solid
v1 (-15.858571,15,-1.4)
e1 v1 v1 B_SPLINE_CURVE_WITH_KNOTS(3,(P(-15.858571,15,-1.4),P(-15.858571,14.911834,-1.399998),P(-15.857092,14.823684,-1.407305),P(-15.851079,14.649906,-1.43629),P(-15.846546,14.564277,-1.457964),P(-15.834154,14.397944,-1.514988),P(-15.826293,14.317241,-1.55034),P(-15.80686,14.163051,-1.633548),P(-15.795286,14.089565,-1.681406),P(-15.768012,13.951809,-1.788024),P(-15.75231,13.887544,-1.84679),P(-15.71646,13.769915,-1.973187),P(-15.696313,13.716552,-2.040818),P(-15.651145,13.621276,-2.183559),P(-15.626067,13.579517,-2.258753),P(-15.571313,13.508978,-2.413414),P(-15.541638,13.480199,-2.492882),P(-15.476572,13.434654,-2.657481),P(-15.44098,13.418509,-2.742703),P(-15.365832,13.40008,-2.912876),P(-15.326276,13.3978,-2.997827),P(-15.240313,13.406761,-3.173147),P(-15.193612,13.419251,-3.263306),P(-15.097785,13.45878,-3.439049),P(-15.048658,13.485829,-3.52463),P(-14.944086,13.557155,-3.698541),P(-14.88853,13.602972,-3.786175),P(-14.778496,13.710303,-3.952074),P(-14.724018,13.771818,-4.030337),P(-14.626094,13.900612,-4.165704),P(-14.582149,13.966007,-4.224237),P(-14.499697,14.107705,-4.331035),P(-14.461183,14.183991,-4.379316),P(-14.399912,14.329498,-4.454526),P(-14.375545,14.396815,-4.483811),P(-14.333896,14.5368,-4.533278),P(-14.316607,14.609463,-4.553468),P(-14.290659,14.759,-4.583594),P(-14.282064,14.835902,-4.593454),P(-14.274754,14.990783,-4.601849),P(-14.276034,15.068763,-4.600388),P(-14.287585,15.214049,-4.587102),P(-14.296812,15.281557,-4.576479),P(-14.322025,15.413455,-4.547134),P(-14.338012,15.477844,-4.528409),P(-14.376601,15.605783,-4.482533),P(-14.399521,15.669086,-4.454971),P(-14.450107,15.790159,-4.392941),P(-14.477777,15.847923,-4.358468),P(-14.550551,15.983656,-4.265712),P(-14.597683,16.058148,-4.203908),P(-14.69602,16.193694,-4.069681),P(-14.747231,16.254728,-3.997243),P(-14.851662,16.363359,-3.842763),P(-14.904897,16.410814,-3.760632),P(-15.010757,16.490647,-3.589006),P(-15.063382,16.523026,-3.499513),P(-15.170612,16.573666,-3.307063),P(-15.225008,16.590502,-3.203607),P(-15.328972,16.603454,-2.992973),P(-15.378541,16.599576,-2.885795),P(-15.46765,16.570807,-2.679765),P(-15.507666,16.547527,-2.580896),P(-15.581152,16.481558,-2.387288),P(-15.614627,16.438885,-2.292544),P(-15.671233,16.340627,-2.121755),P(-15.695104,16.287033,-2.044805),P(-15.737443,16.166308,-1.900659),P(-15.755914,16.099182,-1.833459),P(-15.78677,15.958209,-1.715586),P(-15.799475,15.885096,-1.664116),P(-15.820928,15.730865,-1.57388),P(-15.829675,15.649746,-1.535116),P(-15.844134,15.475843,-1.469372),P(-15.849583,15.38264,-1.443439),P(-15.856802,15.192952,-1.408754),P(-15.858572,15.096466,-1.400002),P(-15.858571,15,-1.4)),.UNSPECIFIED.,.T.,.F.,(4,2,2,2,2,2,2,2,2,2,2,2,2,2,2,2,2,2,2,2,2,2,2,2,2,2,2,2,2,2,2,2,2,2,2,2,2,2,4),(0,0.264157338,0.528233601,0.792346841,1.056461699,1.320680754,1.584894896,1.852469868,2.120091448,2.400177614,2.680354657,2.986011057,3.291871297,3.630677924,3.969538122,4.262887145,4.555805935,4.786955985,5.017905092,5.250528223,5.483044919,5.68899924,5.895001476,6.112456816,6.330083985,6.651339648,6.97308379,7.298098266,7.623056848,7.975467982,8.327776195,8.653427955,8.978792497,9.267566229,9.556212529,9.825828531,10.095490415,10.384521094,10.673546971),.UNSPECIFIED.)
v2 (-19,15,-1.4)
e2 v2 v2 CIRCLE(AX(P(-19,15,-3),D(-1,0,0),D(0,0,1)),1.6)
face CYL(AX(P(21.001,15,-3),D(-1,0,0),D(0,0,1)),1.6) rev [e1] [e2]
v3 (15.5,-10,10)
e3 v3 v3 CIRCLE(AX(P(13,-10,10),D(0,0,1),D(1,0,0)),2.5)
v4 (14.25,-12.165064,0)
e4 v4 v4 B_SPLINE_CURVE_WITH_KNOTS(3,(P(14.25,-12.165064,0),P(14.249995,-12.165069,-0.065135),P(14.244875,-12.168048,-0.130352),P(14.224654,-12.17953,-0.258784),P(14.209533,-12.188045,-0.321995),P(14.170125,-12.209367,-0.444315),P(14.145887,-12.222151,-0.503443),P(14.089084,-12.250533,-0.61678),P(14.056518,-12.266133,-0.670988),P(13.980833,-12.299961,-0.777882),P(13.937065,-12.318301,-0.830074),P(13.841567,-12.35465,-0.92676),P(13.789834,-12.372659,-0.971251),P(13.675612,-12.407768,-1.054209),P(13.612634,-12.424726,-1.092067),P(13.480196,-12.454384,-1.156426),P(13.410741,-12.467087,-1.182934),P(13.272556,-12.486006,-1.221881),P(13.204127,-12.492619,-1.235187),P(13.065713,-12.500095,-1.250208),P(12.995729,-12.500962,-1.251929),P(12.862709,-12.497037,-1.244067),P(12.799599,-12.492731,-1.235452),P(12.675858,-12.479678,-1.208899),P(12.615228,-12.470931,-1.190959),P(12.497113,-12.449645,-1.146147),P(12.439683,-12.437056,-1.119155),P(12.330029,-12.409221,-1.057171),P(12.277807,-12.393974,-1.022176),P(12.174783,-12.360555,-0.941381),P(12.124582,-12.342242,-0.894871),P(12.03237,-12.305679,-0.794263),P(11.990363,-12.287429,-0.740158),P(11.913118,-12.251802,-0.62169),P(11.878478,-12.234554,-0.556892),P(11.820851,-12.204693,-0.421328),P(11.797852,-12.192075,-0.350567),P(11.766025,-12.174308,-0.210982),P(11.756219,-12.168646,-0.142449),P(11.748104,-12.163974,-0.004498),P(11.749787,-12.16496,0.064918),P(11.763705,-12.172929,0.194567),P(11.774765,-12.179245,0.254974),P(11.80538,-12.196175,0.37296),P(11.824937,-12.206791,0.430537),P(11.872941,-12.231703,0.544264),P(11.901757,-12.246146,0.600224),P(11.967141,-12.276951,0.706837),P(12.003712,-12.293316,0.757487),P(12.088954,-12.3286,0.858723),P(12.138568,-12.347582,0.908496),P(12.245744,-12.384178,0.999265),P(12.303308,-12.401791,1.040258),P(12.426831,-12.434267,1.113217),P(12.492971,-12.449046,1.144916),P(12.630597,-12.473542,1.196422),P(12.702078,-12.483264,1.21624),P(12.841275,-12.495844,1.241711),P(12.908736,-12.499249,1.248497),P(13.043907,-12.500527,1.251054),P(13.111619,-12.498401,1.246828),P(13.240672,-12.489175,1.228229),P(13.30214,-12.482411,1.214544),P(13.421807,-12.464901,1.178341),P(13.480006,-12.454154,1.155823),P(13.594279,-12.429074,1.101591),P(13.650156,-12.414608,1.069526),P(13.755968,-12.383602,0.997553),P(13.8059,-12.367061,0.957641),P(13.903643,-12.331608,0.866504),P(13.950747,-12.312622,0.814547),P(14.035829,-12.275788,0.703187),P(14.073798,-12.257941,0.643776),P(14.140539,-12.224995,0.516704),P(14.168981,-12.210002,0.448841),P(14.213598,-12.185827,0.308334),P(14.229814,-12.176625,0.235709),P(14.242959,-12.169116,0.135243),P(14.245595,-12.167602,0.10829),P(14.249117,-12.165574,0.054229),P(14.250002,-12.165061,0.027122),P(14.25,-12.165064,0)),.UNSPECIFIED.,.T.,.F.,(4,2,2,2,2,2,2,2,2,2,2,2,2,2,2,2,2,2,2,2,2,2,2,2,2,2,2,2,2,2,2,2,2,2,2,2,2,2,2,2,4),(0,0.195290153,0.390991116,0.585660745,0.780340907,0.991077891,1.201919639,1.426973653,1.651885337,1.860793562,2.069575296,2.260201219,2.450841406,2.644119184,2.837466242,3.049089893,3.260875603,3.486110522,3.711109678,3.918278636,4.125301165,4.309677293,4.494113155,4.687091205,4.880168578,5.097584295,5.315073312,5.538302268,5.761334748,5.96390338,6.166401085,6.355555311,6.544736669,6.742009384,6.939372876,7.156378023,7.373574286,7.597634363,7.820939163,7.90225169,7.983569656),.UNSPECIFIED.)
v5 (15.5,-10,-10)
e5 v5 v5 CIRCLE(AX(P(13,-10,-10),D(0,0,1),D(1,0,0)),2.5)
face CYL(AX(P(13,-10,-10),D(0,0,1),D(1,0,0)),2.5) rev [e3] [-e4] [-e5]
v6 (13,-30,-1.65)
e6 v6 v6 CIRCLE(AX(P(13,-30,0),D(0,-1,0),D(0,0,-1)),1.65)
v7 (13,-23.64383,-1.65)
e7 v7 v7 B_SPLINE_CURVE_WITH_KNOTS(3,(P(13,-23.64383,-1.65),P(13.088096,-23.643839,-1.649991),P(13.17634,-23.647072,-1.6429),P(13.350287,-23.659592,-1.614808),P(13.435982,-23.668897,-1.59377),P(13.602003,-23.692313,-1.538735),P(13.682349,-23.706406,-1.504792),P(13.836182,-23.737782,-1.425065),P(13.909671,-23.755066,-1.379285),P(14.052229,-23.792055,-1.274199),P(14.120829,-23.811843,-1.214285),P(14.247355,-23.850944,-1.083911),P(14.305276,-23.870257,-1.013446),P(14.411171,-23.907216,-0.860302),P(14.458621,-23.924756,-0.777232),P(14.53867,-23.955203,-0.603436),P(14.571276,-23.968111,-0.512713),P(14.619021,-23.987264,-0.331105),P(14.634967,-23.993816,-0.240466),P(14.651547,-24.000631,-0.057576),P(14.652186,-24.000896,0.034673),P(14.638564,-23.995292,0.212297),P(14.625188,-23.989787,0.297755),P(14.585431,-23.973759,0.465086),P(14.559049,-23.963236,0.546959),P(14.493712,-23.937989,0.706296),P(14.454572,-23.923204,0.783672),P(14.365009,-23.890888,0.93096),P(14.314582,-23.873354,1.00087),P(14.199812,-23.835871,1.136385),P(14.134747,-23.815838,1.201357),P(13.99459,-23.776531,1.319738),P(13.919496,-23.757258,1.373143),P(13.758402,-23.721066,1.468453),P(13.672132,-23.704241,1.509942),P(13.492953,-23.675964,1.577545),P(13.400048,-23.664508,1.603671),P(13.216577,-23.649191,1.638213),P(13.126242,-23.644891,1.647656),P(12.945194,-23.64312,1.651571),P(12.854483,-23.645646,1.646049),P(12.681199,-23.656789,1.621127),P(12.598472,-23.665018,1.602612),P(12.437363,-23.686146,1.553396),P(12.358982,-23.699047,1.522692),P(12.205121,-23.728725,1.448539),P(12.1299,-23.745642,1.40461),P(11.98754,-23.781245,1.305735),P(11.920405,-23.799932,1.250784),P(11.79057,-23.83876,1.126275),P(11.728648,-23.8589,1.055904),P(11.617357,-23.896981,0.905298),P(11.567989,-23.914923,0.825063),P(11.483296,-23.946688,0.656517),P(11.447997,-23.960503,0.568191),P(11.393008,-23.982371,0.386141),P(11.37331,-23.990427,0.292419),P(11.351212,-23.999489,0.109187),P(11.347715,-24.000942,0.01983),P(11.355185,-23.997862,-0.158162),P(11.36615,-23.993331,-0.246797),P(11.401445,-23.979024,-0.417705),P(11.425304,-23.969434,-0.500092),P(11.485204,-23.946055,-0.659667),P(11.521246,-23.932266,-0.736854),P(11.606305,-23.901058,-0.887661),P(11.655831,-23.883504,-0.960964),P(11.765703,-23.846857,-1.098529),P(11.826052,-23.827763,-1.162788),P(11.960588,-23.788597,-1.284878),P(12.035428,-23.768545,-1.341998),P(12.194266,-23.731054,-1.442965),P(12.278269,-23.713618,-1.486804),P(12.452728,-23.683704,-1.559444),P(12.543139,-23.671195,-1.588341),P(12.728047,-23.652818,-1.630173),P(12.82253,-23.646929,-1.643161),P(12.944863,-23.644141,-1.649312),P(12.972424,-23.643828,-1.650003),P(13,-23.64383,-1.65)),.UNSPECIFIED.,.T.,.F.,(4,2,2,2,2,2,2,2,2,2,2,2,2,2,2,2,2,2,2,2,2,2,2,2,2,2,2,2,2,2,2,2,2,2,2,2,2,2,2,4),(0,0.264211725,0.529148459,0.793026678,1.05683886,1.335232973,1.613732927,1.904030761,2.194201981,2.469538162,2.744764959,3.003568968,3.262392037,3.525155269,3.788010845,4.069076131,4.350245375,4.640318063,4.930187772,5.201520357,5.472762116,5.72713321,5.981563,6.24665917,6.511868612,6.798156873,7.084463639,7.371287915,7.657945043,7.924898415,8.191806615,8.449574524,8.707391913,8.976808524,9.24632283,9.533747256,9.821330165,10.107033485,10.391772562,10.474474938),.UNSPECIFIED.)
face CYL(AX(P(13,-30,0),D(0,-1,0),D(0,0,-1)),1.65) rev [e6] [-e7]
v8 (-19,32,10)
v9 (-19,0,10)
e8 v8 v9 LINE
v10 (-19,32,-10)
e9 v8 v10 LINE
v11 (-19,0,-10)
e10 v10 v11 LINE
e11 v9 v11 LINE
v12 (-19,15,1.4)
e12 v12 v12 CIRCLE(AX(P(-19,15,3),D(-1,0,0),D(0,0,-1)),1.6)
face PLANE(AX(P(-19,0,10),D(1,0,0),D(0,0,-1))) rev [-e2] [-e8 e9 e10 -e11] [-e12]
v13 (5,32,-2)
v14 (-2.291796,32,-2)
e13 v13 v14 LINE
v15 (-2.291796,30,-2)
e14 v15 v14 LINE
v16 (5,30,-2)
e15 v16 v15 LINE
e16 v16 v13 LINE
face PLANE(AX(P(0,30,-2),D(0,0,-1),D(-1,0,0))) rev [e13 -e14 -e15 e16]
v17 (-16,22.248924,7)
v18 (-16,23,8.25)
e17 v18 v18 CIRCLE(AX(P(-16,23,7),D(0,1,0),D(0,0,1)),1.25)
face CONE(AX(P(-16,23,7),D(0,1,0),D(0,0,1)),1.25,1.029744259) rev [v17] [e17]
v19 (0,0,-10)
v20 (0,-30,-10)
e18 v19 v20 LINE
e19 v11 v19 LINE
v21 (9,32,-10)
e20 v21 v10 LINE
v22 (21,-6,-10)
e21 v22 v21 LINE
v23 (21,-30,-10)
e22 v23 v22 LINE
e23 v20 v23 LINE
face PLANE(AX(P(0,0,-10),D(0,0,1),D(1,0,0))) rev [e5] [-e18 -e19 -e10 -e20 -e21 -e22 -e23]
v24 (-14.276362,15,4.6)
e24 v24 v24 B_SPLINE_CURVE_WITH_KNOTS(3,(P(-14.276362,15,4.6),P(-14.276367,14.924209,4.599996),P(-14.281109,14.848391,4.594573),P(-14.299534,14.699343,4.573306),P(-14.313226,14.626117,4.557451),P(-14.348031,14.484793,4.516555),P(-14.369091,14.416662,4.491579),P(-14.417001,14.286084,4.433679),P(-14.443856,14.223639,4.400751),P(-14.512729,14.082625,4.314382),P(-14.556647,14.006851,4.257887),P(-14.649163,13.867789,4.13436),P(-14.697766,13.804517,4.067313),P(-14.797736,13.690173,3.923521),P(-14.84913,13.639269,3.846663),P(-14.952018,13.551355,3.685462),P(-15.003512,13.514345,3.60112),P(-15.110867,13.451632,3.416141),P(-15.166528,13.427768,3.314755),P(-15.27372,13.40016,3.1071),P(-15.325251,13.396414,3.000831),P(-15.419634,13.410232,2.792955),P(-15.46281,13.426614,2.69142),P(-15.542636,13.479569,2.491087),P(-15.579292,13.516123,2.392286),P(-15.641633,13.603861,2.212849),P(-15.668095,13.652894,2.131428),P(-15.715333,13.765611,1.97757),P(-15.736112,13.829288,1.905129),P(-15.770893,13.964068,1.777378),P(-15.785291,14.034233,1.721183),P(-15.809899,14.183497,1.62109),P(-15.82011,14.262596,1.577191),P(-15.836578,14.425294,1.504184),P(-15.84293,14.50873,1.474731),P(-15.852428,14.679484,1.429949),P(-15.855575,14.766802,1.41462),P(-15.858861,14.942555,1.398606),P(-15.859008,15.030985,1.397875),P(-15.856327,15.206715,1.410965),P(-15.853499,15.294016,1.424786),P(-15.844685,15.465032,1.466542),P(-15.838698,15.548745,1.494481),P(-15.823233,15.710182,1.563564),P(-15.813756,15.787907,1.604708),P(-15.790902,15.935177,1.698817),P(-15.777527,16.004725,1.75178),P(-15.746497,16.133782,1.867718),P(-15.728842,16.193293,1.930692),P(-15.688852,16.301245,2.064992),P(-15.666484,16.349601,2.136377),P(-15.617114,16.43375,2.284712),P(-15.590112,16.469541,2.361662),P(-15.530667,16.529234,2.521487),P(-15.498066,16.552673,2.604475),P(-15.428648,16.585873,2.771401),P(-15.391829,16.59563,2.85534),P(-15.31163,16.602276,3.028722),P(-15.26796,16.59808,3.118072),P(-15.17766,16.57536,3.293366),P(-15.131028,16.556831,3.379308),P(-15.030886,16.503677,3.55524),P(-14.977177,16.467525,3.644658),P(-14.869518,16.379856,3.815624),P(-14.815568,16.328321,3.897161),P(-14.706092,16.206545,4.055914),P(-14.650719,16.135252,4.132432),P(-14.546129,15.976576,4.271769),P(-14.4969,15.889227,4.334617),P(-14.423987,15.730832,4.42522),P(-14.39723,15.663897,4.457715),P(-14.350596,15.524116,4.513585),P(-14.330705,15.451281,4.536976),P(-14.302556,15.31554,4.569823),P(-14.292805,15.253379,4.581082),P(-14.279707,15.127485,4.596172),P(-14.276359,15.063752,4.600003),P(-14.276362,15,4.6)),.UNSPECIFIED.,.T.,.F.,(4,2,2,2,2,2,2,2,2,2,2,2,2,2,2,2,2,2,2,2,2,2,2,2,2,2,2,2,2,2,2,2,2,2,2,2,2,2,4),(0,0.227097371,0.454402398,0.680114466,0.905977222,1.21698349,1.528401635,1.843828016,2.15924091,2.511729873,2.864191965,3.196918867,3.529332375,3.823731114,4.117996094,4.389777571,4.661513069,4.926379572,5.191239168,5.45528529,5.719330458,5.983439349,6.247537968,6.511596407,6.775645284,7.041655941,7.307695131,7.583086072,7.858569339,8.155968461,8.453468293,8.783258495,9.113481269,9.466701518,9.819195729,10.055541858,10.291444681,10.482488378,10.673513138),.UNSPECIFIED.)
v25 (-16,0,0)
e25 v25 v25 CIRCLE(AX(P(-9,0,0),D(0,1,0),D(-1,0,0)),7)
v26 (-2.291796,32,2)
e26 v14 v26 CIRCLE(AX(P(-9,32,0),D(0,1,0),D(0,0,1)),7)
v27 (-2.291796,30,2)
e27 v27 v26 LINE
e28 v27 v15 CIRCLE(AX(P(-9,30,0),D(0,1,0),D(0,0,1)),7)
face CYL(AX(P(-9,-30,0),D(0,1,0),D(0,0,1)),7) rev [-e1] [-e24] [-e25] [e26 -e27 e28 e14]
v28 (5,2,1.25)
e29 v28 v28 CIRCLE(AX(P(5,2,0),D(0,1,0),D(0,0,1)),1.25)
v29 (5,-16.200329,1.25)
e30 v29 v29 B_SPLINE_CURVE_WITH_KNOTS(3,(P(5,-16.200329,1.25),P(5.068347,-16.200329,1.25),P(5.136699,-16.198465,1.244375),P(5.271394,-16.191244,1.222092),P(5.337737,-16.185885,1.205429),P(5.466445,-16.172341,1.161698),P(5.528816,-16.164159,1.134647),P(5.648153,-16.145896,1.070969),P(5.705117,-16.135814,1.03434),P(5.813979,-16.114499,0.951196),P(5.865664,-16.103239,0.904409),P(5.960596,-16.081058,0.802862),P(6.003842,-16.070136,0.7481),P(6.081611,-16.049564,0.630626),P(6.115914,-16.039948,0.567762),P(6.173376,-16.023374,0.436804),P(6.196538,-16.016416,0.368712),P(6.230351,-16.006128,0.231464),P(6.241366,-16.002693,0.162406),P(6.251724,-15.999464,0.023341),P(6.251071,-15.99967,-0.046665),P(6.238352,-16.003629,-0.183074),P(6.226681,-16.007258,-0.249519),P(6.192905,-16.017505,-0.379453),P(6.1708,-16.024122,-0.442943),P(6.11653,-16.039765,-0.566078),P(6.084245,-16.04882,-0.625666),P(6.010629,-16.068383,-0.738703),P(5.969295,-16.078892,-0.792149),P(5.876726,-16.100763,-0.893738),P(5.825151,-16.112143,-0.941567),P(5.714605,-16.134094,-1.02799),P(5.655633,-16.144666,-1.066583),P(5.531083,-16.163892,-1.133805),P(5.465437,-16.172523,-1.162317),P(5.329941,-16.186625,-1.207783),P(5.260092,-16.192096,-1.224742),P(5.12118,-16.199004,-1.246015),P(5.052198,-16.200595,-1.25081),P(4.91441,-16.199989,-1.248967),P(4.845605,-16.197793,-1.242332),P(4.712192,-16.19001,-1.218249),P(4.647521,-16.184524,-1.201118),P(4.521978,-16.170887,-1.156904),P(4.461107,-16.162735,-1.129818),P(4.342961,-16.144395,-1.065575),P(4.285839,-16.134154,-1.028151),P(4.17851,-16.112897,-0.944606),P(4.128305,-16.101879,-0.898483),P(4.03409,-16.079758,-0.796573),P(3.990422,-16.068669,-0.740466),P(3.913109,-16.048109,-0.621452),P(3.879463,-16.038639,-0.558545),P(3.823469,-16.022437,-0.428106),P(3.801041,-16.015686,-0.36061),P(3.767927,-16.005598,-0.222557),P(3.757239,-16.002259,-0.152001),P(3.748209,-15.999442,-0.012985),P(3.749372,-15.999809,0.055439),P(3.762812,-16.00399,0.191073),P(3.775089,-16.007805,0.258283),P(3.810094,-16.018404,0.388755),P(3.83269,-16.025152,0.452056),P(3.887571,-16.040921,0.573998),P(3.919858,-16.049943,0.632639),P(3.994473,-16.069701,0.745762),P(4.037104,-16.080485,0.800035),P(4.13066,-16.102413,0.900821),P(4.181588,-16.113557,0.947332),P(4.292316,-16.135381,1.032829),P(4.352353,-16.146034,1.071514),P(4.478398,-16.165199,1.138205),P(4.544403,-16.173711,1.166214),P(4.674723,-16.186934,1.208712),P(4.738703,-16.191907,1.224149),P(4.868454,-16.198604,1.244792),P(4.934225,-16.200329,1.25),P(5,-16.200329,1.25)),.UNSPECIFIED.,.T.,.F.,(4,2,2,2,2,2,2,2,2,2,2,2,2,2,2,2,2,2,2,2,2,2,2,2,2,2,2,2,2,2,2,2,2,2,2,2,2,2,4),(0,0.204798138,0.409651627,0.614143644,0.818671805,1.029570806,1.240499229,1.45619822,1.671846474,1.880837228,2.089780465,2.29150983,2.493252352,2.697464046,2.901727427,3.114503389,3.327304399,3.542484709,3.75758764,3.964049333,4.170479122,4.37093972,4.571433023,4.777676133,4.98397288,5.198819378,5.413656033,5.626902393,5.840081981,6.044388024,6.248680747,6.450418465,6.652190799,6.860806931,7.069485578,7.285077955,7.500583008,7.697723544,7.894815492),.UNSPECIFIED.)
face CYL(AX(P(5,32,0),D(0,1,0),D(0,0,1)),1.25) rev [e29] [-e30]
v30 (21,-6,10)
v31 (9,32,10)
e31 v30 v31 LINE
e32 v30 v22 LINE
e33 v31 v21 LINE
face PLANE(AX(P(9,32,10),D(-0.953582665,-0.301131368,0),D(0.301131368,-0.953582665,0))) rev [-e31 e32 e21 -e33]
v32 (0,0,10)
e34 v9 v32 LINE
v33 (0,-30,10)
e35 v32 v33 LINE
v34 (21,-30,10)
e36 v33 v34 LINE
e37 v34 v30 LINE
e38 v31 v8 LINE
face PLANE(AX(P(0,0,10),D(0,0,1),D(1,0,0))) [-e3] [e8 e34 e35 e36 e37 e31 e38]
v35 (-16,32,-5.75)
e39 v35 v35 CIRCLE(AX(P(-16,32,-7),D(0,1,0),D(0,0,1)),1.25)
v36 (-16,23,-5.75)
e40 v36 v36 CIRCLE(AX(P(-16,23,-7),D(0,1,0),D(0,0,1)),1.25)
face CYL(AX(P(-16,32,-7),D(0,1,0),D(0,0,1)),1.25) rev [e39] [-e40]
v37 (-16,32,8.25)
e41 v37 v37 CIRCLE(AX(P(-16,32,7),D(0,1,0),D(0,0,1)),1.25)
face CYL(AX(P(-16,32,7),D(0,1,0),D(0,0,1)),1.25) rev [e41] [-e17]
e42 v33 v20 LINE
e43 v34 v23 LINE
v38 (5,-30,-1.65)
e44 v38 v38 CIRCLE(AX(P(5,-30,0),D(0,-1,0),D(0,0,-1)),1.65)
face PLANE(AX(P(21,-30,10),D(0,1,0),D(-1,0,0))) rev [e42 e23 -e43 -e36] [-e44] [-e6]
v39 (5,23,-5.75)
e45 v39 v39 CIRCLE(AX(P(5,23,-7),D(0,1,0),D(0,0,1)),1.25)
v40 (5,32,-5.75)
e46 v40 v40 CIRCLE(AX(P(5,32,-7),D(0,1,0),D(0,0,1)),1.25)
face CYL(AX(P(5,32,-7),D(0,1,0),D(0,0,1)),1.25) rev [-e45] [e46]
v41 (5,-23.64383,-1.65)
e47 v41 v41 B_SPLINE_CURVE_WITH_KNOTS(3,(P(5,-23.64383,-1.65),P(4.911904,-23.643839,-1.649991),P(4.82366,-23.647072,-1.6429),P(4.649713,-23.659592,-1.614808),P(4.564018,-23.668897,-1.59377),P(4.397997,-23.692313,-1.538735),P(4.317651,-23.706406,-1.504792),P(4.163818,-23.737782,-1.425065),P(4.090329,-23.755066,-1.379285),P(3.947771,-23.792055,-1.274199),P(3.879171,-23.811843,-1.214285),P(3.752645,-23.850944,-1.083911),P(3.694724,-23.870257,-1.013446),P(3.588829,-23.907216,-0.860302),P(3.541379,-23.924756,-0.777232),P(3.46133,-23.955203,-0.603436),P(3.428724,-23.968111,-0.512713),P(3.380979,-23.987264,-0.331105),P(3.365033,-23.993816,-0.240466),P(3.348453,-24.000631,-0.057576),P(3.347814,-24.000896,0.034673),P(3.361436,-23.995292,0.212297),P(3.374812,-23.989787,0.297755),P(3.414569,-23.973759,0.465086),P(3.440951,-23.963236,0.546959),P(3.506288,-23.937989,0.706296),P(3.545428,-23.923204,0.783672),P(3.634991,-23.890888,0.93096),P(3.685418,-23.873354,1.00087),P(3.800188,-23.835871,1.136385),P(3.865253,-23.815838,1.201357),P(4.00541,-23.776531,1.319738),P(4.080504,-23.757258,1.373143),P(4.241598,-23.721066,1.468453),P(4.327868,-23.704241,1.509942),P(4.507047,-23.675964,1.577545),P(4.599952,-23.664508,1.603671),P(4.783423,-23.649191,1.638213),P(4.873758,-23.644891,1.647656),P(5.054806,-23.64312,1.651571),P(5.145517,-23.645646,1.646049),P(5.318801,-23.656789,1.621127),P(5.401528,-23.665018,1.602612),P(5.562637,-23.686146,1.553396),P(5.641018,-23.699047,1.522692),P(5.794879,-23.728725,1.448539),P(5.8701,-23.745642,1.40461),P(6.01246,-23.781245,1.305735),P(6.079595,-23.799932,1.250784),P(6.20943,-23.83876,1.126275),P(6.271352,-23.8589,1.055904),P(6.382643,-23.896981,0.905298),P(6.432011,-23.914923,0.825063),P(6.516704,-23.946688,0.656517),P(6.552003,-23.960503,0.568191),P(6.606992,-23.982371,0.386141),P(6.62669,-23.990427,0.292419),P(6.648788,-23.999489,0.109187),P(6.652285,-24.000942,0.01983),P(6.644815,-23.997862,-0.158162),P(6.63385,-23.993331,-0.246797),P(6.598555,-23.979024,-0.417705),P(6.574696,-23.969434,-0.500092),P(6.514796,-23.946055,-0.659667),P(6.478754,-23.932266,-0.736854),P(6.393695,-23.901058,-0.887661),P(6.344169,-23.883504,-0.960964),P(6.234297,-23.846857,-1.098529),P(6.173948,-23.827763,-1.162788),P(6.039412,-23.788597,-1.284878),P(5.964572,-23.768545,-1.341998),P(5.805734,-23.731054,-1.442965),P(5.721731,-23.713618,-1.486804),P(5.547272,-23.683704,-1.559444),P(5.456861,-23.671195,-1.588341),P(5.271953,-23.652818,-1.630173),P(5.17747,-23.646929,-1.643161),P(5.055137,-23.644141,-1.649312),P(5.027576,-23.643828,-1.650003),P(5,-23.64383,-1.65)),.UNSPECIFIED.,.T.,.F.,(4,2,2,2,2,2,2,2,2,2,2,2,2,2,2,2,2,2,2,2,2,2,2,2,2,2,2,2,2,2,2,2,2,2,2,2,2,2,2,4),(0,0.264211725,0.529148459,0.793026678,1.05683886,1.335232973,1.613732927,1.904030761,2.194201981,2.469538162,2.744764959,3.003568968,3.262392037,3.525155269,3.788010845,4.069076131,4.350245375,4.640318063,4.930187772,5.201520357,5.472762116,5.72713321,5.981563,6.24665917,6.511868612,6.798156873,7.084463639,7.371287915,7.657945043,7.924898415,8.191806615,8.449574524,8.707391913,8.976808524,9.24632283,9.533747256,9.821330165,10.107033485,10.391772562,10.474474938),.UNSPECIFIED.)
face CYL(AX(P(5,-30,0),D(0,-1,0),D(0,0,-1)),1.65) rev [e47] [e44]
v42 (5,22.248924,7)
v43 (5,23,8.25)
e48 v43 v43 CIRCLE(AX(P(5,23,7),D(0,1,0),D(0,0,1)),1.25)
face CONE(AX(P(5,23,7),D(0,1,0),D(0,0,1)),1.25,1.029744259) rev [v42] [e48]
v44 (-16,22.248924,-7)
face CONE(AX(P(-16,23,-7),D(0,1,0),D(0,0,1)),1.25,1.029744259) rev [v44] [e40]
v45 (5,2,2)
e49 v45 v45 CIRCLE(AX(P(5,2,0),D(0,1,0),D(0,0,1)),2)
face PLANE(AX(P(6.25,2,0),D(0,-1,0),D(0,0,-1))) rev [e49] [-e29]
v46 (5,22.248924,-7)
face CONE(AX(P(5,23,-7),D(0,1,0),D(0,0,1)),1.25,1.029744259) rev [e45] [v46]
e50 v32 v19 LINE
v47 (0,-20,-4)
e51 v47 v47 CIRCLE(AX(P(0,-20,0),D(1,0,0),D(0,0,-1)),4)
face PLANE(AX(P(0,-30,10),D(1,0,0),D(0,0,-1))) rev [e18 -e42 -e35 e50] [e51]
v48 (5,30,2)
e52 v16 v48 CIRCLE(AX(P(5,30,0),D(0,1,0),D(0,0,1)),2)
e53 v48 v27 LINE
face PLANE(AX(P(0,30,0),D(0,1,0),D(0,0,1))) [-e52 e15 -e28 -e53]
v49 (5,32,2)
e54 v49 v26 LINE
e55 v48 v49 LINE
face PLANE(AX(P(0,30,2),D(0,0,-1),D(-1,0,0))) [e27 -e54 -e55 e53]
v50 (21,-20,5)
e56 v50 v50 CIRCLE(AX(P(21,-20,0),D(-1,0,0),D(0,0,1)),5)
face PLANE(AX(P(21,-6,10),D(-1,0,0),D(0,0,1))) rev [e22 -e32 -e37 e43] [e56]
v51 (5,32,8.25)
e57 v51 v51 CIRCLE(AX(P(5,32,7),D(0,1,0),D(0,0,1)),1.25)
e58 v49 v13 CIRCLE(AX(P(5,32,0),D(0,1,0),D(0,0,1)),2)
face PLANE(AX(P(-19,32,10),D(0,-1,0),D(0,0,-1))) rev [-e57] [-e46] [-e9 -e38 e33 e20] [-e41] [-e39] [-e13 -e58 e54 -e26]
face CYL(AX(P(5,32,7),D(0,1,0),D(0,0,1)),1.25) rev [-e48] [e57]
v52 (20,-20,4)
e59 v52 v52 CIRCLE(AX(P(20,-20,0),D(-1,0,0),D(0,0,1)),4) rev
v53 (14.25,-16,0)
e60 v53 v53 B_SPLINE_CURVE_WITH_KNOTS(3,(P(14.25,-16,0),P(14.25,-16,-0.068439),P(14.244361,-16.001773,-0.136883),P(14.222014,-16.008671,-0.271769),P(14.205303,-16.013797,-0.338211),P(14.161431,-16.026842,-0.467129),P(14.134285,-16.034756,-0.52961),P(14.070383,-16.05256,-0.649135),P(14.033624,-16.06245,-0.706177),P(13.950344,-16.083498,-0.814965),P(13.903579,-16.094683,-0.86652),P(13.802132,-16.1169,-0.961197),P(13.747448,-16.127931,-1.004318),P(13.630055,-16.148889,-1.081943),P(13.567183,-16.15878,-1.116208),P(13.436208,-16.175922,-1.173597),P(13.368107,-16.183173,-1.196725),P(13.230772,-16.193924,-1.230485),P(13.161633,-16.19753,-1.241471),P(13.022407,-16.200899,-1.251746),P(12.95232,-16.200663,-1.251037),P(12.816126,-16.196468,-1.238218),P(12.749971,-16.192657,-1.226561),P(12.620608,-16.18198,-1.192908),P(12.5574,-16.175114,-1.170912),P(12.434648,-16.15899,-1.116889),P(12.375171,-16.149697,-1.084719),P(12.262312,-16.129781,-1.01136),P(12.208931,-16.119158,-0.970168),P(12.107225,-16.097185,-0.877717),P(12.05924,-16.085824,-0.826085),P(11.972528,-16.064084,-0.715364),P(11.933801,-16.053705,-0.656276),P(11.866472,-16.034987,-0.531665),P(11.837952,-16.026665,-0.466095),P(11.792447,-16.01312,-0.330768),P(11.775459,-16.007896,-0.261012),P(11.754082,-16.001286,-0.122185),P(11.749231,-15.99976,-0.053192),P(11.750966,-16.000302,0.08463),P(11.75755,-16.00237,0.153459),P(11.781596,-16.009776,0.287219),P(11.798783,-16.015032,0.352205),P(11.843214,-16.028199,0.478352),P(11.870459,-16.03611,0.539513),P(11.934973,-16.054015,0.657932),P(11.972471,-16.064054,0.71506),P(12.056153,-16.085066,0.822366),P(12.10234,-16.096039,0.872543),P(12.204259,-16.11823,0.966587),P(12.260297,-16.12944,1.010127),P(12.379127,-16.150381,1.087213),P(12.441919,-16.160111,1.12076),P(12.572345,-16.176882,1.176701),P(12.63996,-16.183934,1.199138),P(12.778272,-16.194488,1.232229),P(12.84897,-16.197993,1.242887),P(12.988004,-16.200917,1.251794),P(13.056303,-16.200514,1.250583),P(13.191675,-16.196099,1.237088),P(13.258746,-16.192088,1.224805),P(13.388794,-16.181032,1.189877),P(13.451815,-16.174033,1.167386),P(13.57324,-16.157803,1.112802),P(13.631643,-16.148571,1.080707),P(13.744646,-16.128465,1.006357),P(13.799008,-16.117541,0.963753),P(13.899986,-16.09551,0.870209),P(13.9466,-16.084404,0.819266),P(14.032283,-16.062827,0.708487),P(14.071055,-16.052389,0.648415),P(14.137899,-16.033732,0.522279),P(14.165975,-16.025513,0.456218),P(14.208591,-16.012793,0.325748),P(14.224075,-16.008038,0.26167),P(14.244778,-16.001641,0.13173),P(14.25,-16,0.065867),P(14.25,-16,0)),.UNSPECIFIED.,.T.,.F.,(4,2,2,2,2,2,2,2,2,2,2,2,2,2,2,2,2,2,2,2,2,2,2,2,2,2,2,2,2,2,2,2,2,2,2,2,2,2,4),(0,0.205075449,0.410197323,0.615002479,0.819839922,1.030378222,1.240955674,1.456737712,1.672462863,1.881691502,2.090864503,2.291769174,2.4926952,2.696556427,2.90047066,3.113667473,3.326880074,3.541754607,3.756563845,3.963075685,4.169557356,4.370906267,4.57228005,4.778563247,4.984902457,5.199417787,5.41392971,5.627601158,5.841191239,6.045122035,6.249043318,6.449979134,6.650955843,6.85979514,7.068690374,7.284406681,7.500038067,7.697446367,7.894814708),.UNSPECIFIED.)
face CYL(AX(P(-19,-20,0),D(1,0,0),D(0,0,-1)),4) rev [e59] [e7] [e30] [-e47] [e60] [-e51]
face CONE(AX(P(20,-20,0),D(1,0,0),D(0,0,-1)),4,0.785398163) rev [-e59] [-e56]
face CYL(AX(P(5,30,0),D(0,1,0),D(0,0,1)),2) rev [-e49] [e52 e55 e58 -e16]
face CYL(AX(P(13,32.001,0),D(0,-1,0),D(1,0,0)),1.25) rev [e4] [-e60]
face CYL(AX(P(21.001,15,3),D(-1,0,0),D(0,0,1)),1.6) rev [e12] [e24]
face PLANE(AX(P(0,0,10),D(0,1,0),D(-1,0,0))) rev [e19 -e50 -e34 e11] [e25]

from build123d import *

# Parameters (mm, degrees)
BOSS_EXTRUDE1_DEPTH      = 10
CUT_EXTRUDE1_DEPTH       = 67.219333
CUT_EXTRUDE2_DEPTH       = 2
M3_TAPPED_HOLE1_D        = 2.5
M3_TAPPED_HOLE1_DEPTH    = 9
M3_TAPPED_HOLE1_TIP      = 0.751076
SKETCH6_R                = 2.5
CUT_EXTRUDE3_DEPTH       = 44.185646
SKETCH7_R                = 4
CUT_EXTRUDE4_DEPTH       = 53.191953
CHAMFER1_SIZE            = 1
HOLE1_START              = 2
HOLE1_OUTLINE_R          = 2
HOLE1_DEPTH              = 28
HOLE1_START_2            = -17
HOLE1_2_OUTLINE_R        = 1.25
HOLE1_2_DEPTH            = 19
CUT_EXTRUDE5_REACH       = 54.192
CUT_EXTRUDE5_END_RADIUS  = 7
SKETCH10_R               = 1.6
CUT_EXTRUDE6_START       = -6.35617
CUT_EXTRUDE6_OUTLINE_R   = 1.65
CUT_EXTRUDE6_DEPTH       = 6.35617
CUT_EXTRUDE6_START_2     = -17.834937
CUT_EXTRUDE6_2_OUTLINE_R = 1.25
CUT_EXTRUDE6_2_DEPTH     = 11.478767


with BuildPart() as part:
    # Sketch2 → Boss-Extrude1 (new, symmetric)
    with BuildSketch(Plane.XY):
        Polygon((0, 0), (-19, 0), (-19, 32), (9, 32), (21, -6), (21, -30), (0, -30), align=None)
    extrude(amount=BOSS_EXTRUDE1_DEPTH, both=True)

    # Sketch3 → Cut-Extrude1 (cut, through all)
    with BuildSketch(Plane(origin=(0, 32, 0), x_dir=(1, 0, 0), z_dir=(0, 1, 0))):
        with BuildLine():
            ThreePointArc((-2.291796, 2), (-10.010587, 6.926667), (-16, 0))
            Line((-16, 0), (-2, 0))
            ThreePointArc((-2, 0), (-2.073333, 1.010587), (-2.291796, 2))
        make_face()
        with BuildLine():
            Line((-2, 0), (-16, 0))
            ThreePointArc((-16, 0), (-10.010587, -6.926667), (-2.291796, -2))
            ThreePointArc((-2.291796, -2), (-2.073333, -1.010587), (-2, 0))
        make_face()
    extrude(amount=-CUT_EXTRUDE1_DEPTH, mode=Mode.SUBTRACT)

    # Sketch3<3> → Cut-Extrude2 (cut)
    with BuildSketch(Plane(origin=(0, 32, 0), x_dir=(1, 0, 0), z_dir=(0, 1, 0))):
        with BuildLine():
            ThreePointArc((-2.291796, 2), (-2.073333, 1.010587), (-2, 0))
            Line((-2, 0), (3, 0))
            ThreePointArc((3, 0), (3.585786, 1.414214), (5, 2))
            Line((5, 2), (-2.291796, 2))
        make_face()
        with BuildLine():
            Line((3, 0), (-2, 0))
            ThreePointArc((-2, 0), (-2.073333, -1.010587), (-2.291796, -2))
            Line((-2.291796, -2), (5, -2))
            ThreePointArc((5, -2), (3.585786, -1.414214), (3, 0))
        make_face()
        with BuildLine():
            ThreePointArc((5, 2), (3.585786, 1.414214), (3, 0))
            Line((3, 0), (7, 0))
            ThreePointArc((7, 0), (6.414214, 1.414214), (5, 2))
        make_face()
        with BuildLine():
            Line((7, 0), (3, 0))
            ThreePointArc((3, 0), (3.585786, -1.414214), (5, -2))
            ThreePointArc((5, -2), (6.414214, -1.414214), (7, 0))
        make_face()
    extrude(amount=-CUT_EXTRUDE2_DEPTH, mode=Mode.SUBTRACT)

    # M3 Tapped Hole1
    with Locations(Plane(origin=(0, 32, 0), x_dir=(1, 0, 0), z_dir=(0, 1, 0))):
        with Locations((-16, 7), (-16, -7), (5, -7), (5, 7)):
            Hole(M3_TAPPED_HOLE1_D / 2, depth=M3_TAPPED_HOLE1_DEPTH)
            with Locations((0, 0, -(M3_TAPPED_HOLE1_DEPTH + M3_TAPPED_HOLE1_TIP / 2))):  # 118° drill point
                Cone(0, M3_TAPPED_HOLE1_D / 2, M3_TAPPED_HOLE1_TIP, mode=Mode.SUBTRACT)

    # Sketch6 → Cut-Extrude3 (cut, through all)
    with BuildSketch(Plane.XY.offset(10)):
        with Locations((13, -10)):
            Circle(SKETCH6_R)
    extrude(amount=-CUT_EXTRUDE3_DEPTH, mode=Mode.SUBTRACT)

    # Sketch7 → Cut-Extrude4 (cut, through all)
    with BuildSketch(Plane(origin=(21, 0, 0), x_dir=(0, 0, -1), z_dir=(1, 0, 0))):
        with Locations((0, -20)):
            Circle(SKETCH7_R)
    extrude(amount=-CUT_EXTRUDE4_DEPTH, mode=Mode.SUBTRACT)

    # Chamfer1
    chamfer1_edges = [part.edges().sort_by_distance(p)[0] for p in [
        (21, -20, 4),
    ]]
    chamfer(chamfer1_edges, length=CHAMFER1_SIZE)

    # Hole1: read off the stored shape, not the designer's step
    # Hole1 outline → Hole1 (cut)
    with BuildSketch(Plane(origin=(0, 0, 0), x_dir=(1, 0, 0), z_dir=(0, 1, 0)).offset(HOLE1_START)):
        with Locations((5, 0)):
            Circle(HOLE1_OUTLINE_R)
    extrude(amount=HOLE1_DEPTH, mode=Mode.SUBTRACT)

    # Hole1 2 outline → Hole1 2 (cut)
    with BuildSketch(Plane(origin=(0, 0, 0), x_dir=(1, 0, 0), z_dir=(0, 1, 0)).offset(HOLE1_START_2)):
        with Locations((5, 0)):
            Circle(HOLE1_2_OUTLINE_R)
    extrude(amount=HOLE1_2_DEPTH, mode=Mode.SUBTRACT)

    # Cut-Extrude5: up to this cylinder (the profile starts outside it)
    cut_extrude5_end = Plane(origin=(-9, 15, 0), z_dir=(0, 1, 0)) * Cylinder(CUT_EXTRUDE5_END_RADIUS, 123.384, mode=Mode.PRIVATE)
    # Sketch10 → Cut-Extrude5 (cut, up to the surface)
    with BuildSketch(Plane.ZY.offset(19), mode=Mode.PRIVATE) as cut_extrude5_sk1:
        with Locations((-3, 15)):
            Circle(SKETCH10_R)
    cut_extrude5_tool1 = extrude(cut_extrude5_sk1.sketch, amount=-CUT_EXTRUDE5_REACH, mode=Mode.PRIVATE) - cut_extrude5_end
    add(cut_extrude5_tool1.solids().sort_by_distance((-19, 15, -3))[0], mode=Mode.SUBTRACT)
    # Sketch10 → Cut-Extrude5 (cut, up to the surface)
    with BuildSketch(Plane.ZY.offset(19), mode=Mode.PRIVATE) as cut_extrude5_sk2:
        with Locations((3, 15)):
            Circle(SKETCH10_R)
    cut_extrude5_tool2 = extrude(cut_extrude5_sk2.sketch, amount=-CUT_EXTRUDE5_REACH, mode=Mode.PRIVATE) - cut_extrude5_end
    add(cut_extrude5_tool2.solids().sort_by_distance((-19, 15, 3))[0], mode=Mode.SUBTRACT)

    # Cut-Extrude6: read off the stored shape, not the designer's step
    # Cut-Extrude6 outline → Cut-Extrude6 (cut)
    with BuildSketch(Plane.XZ.offset(30).offset(CUT_EXTRUDE6_START)):
        with Locations((5, 0)):
            Circle(CUT_EXTRUDE6_OUTLINE_R)
        with Locations((13, 0)):
            Circle(CUT_EXTRUDE6_OUTLINE_R)
    extrude(amount=CUT_EXTRUDE6_DEPTH, mode=Mode.SUBTRACT)

    # Cut-Extrude6 2 outline → Cut-Extrude6 2 (cut)
    with BuildSketch(Plane.XZ.offset(30).offset(CUT_EXTRUDE6_START_2)):
        with Locations((13, 0)):
            Circle(CUT_EXTRUDE6_2_OUTLINE_R)
    extrude(amount=CUT_EXTRUDE6_2_DEPTH, mode=Mode.SUBTRACT)


solid = part.part
